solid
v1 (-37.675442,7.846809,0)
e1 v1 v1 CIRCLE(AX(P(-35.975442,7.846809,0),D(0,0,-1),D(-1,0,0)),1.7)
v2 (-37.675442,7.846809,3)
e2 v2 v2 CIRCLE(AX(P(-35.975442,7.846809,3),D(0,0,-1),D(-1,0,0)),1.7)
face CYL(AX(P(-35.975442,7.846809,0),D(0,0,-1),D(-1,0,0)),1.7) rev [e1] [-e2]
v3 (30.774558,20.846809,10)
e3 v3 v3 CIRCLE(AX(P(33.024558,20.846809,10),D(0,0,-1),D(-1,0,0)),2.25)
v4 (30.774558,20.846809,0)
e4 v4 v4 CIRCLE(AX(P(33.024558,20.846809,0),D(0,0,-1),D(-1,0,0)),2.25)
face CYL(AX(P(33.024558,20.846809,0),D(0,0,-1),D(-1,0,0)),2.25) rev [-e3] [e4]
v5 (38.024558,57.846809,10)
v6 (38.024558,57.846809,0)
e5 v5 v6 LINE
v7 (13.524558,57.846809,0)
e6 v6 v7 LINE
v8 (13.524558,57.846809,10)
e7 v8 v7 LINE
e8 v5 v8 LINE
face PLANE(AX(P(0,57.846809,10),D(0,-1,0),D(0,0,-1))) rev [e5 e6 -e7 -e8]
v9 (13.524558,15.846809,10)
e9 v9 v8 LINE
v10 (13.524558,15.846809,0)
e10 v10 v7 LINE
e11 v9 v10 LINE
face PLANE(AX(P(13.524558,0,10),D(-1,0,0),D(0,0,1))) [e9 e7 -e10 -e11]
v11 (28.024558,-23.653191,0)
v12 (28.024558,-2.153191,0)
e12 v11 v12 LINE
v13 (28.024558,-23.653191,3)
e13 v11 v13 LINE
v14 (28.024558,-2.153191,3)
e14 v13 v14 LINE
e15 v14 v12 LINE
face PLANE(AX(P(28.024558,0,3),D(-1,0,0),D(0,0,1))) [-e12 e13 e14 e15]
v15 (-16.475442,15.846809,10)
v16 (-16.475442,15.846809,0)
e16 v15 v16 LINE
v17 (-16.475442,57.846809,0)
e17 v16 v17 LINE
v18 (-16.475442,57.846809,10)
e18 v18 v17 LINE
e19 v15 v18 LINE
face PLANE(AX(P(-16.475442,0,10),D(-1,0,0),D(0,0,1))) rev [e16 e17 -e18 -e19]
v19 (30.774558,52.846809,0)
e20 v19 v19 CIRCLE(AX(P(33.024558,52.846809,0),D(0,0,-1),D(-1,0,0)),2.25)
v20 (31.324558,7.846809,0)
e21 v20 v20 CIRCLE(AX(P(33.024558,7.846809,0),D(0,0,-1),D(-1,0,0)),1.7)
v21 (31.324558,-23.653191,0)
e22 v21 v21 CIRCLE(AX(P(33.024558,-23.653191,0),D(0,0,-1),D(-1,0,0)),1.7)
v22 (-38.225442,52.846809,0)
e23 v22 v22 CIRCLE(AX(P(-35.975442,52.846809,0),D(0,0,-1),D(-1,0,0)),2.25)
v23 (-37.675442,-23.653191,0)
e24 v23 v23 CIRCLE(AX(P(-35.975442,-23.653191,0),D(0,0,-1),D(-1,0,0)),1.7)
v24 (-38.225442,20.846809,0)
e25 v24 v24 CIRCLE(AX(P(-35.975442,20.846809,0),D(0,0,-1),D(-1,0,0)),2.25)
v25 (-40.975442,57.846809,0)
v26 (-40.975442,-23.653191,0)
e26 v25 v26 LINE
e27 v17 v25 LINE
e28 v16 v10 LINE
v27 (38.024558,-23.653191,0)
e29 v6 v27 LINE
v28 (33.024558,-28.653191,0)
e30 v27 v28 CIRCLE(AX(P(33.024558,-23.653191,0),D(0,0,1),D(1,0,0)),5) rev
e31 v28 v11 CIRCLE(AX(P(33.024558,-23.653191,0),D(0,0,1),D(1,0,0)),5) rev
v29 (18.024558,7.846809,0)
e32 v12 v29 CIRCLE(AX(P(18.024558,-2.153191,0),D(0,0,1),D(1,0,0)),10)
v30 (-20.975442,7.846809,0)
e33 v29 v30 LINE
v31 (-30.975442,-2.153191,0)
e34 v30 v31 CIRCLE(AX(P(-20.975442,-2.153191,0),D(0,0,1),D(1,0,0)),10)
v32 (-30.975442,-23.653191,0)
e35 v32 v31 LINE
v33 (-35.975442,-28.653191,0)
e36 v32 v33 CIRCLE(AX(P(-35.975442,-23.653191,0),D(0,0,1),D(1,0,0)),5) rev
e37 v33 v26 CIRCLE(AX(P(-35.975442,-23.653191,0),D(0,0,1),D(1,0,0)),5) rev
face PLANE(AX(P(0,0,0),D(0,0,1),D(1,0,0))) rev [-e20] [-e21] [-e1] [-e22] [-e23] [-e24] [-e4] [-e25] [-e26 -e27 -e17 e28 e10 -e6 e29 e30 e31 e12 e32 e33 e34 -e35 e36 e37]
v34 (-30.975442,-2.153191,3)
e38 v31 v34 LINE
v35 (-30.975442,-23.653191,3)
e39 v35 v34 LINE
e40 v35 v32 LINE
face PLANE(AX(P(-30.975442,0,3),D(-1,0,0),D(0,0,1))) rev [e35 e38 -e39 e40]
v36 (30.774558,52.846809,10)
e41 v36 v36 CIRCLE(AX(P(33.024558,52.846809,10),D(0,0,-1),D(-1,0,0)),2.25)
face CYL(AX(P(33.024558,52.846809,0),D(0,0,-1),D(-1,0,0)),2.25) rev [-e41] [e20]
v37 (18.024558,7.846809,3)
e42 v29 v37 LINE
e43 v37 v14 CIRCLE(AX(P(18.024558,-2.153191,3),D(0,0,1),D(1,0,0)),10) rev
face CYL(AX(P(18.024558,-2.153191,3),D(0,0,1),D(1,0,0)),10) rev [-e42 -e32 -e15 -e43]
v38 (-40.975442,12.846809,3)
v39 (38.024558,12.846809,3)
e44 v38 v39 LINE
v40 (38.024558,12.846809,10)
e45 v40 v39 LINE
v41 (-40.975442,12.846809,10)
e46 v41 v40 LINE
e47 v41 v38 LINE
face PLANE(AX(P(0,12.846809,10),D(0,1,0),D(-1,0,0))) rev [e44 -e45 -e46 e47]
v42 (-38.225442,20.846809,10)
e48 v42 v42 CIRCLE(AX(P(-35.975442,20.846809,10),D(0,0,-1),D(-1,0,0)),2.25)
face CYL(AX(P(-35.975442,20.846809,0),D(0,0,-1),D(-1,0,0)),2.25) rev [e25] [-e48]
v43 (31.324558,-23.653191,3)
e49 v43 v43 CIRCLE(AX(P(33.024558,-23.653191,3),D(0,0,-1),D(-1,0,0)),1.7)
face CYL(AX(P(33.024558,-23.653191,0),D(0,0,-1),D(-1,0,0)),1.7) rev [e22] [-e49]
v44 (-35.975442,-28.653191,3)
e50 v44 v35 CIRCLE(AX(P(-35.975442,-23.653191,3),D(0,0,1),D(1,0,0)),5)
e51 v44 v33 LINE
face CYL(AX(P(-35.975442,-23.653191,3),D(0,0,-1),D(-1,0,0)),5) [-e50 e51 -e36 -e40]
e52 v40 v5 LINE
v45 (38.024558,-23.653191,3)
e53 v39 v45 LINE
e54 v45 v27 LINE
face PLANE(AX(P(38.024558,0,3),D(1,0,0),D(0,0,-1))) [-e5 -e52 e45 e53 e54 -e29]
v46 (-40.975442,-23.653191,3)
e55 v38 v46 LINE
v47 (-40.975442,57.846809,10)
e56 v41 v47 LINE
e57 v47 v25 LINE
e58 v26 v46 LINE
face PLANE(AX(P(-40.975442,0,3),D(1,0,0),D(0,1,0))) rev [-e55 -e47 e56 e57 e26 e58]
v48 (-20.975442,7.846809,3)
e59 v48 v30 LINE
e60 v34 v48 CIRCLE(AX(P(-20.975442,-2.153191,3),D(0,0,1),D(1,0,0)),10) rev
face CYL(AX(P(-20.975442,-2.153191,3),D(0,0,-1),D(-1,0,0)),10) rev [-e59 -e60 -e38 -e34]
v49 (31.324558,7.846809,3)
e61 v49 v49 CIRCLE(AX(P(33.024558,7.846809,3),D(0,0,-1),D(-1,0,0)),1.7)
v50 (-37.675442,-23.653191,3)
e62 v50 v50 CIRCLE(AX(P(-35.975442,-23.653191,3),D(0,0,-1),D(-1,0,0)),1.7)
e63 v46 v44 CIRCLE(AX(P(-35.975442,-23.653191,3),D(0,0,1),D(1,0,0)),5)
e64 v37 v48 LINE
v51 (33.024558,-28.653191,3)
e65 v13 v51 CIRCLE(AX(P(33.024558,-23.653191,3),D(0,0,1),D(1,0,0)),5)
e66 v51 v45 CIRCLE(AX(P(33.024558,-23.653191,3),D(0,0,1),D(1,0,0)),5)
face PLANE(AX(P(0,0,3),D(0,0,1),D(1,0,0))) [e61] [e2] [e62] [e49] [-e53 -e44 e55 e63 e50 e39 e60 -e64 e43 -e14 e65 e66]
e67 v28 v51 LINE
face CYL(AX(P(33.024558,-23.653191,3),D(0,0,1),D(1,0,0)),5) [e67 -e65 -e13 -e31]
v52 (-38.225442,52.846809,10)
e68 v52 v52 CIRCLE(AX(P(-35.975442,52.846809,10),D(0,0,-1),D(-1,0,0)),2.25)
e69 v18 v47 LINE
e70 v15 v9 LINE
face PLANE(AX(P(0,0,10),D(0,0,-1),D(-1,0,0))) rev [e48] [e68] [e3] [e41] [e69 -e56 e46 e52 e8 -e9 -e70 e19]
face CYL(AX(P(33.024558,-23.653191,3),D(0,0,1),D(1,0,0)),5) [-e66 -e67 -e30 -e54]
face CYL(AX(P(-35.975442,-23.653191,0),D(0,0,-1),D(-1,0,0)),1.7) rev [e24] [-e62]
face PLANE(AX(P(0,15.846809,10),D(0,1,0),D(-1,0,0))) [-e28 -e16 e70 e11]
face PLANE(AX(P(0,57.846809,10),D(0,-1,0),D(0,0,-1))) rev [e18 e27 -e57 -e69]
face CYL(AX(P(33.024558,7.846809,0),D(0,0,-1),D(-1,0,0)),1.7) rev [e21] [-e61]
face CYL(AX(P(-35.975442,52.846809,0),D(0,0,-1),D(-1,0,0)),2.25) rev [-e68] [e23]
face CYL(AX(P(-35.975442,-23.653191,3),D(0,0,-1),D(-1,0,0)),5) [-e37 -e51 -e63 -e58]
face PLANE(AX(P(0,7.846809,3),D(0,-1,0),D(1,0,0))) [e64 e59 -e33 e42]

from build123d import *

# Parameters (mm, degrees)
BOSS_EXTRUDE1_DEPTH  = 3
FILLET1_R            = 10
FILLET2_R            = 5
M3_CLEARANCE_HOLE1_D = 3.4
BOSS_EXTRUDE3_DEPTH  = 10
M4_CLEARANCE_HOLE1_D = 4.5


with BuildPart() as part:
    # Sketch1 → Boss-Extrude1 (new body)
    with BuildSketch(Plane.XY):
        Polygon((28.024558014, 7.846809304), (28.024558014, -28.653190696), (38.024558014, -28.653190696), (38.024558014, 12.846809304), (-40.975441986, 12.846809304), (-40.975441986, -28.653190696), (-30.975441986, -28.653190696), (-30.975441986, 7.846809304), align=None)
    extrude(amount=BOSS_EXTRUDE1_DEPTH)

    # Fillet1
    fillet1_edges = [part.edges().sort_by_distance(p)[0] for p in [
        (28.024558014, 7.846809304, 1.5),
        (-30.975441986, 7.846809304, 1.5),
    ]]
    fillet(fillet1_edges, radius=FILLET1_R)

    # Fillet2
    fillet2_edges = [part.edges().sort_by_distance(p)[0] for p in [
        (-30.975441986, -28.653190696, 1.5),
        (-40.975441986, -28.653190696, 1.5),
        (28.024558014, -28.653190696, 1.5),
        (38.024558014, -28.653190696, 1.5),
    ]]
    fillet(fillet2_edges, radius=FILLET2_R - 0.0001)  # a hair under: the kernel refuses the full size

    # M3 Clearance Hole1 (through all)
    with Locations(Plane(origin=(0, 0, 0), x_dir=(-1, 0, 0), z_dir=(0, 0, -1))):
        with Locations((-33.024558014, 7.846809304), (35.975441986, -23.653190696), (35.975441986, 7.846809304), (-33.024558014, -23.653190696)):
            Hole(M3_CLEARANCE_HOLE1_D / 2)

    # Sketch5 → Boss-Extrude3 (add)
    with BuildSketch(Plane(origin=(0, 0, 0), x_dir=(-1, 0, 0), z_dir=(0, 0, -1))):
        Polygon((-38.024558014, 57.846809304), (-38.024558014, 12.846809304), (40.975441986, 12.846809304), (40.975441986, 57.846809304), (16.475441986, 57.846809304), (16.475441986, 15.846809304), (-13.524558014, 15.846809304), (-13.524558014, 57.846809304), align=None)
    extrude(amount=-BOSS_EXTRUDE3_DEPTH)

    # M4 Clearance Hole1 (through all)
    with Locations(Plane(origin=(0, 0, 0), x_dir=(-1, 0, 0), z_dir=(0, 0, -1))):
        with Locations((-33.024558014, 52.846809304), (-33.024558014, 20.846809304), (35.975441986, 20.846809304), (35.975441986, 52.846809304)):
            Hole(M4_CLEARANCE_HOLE1_D / 2)


solid = part.part
